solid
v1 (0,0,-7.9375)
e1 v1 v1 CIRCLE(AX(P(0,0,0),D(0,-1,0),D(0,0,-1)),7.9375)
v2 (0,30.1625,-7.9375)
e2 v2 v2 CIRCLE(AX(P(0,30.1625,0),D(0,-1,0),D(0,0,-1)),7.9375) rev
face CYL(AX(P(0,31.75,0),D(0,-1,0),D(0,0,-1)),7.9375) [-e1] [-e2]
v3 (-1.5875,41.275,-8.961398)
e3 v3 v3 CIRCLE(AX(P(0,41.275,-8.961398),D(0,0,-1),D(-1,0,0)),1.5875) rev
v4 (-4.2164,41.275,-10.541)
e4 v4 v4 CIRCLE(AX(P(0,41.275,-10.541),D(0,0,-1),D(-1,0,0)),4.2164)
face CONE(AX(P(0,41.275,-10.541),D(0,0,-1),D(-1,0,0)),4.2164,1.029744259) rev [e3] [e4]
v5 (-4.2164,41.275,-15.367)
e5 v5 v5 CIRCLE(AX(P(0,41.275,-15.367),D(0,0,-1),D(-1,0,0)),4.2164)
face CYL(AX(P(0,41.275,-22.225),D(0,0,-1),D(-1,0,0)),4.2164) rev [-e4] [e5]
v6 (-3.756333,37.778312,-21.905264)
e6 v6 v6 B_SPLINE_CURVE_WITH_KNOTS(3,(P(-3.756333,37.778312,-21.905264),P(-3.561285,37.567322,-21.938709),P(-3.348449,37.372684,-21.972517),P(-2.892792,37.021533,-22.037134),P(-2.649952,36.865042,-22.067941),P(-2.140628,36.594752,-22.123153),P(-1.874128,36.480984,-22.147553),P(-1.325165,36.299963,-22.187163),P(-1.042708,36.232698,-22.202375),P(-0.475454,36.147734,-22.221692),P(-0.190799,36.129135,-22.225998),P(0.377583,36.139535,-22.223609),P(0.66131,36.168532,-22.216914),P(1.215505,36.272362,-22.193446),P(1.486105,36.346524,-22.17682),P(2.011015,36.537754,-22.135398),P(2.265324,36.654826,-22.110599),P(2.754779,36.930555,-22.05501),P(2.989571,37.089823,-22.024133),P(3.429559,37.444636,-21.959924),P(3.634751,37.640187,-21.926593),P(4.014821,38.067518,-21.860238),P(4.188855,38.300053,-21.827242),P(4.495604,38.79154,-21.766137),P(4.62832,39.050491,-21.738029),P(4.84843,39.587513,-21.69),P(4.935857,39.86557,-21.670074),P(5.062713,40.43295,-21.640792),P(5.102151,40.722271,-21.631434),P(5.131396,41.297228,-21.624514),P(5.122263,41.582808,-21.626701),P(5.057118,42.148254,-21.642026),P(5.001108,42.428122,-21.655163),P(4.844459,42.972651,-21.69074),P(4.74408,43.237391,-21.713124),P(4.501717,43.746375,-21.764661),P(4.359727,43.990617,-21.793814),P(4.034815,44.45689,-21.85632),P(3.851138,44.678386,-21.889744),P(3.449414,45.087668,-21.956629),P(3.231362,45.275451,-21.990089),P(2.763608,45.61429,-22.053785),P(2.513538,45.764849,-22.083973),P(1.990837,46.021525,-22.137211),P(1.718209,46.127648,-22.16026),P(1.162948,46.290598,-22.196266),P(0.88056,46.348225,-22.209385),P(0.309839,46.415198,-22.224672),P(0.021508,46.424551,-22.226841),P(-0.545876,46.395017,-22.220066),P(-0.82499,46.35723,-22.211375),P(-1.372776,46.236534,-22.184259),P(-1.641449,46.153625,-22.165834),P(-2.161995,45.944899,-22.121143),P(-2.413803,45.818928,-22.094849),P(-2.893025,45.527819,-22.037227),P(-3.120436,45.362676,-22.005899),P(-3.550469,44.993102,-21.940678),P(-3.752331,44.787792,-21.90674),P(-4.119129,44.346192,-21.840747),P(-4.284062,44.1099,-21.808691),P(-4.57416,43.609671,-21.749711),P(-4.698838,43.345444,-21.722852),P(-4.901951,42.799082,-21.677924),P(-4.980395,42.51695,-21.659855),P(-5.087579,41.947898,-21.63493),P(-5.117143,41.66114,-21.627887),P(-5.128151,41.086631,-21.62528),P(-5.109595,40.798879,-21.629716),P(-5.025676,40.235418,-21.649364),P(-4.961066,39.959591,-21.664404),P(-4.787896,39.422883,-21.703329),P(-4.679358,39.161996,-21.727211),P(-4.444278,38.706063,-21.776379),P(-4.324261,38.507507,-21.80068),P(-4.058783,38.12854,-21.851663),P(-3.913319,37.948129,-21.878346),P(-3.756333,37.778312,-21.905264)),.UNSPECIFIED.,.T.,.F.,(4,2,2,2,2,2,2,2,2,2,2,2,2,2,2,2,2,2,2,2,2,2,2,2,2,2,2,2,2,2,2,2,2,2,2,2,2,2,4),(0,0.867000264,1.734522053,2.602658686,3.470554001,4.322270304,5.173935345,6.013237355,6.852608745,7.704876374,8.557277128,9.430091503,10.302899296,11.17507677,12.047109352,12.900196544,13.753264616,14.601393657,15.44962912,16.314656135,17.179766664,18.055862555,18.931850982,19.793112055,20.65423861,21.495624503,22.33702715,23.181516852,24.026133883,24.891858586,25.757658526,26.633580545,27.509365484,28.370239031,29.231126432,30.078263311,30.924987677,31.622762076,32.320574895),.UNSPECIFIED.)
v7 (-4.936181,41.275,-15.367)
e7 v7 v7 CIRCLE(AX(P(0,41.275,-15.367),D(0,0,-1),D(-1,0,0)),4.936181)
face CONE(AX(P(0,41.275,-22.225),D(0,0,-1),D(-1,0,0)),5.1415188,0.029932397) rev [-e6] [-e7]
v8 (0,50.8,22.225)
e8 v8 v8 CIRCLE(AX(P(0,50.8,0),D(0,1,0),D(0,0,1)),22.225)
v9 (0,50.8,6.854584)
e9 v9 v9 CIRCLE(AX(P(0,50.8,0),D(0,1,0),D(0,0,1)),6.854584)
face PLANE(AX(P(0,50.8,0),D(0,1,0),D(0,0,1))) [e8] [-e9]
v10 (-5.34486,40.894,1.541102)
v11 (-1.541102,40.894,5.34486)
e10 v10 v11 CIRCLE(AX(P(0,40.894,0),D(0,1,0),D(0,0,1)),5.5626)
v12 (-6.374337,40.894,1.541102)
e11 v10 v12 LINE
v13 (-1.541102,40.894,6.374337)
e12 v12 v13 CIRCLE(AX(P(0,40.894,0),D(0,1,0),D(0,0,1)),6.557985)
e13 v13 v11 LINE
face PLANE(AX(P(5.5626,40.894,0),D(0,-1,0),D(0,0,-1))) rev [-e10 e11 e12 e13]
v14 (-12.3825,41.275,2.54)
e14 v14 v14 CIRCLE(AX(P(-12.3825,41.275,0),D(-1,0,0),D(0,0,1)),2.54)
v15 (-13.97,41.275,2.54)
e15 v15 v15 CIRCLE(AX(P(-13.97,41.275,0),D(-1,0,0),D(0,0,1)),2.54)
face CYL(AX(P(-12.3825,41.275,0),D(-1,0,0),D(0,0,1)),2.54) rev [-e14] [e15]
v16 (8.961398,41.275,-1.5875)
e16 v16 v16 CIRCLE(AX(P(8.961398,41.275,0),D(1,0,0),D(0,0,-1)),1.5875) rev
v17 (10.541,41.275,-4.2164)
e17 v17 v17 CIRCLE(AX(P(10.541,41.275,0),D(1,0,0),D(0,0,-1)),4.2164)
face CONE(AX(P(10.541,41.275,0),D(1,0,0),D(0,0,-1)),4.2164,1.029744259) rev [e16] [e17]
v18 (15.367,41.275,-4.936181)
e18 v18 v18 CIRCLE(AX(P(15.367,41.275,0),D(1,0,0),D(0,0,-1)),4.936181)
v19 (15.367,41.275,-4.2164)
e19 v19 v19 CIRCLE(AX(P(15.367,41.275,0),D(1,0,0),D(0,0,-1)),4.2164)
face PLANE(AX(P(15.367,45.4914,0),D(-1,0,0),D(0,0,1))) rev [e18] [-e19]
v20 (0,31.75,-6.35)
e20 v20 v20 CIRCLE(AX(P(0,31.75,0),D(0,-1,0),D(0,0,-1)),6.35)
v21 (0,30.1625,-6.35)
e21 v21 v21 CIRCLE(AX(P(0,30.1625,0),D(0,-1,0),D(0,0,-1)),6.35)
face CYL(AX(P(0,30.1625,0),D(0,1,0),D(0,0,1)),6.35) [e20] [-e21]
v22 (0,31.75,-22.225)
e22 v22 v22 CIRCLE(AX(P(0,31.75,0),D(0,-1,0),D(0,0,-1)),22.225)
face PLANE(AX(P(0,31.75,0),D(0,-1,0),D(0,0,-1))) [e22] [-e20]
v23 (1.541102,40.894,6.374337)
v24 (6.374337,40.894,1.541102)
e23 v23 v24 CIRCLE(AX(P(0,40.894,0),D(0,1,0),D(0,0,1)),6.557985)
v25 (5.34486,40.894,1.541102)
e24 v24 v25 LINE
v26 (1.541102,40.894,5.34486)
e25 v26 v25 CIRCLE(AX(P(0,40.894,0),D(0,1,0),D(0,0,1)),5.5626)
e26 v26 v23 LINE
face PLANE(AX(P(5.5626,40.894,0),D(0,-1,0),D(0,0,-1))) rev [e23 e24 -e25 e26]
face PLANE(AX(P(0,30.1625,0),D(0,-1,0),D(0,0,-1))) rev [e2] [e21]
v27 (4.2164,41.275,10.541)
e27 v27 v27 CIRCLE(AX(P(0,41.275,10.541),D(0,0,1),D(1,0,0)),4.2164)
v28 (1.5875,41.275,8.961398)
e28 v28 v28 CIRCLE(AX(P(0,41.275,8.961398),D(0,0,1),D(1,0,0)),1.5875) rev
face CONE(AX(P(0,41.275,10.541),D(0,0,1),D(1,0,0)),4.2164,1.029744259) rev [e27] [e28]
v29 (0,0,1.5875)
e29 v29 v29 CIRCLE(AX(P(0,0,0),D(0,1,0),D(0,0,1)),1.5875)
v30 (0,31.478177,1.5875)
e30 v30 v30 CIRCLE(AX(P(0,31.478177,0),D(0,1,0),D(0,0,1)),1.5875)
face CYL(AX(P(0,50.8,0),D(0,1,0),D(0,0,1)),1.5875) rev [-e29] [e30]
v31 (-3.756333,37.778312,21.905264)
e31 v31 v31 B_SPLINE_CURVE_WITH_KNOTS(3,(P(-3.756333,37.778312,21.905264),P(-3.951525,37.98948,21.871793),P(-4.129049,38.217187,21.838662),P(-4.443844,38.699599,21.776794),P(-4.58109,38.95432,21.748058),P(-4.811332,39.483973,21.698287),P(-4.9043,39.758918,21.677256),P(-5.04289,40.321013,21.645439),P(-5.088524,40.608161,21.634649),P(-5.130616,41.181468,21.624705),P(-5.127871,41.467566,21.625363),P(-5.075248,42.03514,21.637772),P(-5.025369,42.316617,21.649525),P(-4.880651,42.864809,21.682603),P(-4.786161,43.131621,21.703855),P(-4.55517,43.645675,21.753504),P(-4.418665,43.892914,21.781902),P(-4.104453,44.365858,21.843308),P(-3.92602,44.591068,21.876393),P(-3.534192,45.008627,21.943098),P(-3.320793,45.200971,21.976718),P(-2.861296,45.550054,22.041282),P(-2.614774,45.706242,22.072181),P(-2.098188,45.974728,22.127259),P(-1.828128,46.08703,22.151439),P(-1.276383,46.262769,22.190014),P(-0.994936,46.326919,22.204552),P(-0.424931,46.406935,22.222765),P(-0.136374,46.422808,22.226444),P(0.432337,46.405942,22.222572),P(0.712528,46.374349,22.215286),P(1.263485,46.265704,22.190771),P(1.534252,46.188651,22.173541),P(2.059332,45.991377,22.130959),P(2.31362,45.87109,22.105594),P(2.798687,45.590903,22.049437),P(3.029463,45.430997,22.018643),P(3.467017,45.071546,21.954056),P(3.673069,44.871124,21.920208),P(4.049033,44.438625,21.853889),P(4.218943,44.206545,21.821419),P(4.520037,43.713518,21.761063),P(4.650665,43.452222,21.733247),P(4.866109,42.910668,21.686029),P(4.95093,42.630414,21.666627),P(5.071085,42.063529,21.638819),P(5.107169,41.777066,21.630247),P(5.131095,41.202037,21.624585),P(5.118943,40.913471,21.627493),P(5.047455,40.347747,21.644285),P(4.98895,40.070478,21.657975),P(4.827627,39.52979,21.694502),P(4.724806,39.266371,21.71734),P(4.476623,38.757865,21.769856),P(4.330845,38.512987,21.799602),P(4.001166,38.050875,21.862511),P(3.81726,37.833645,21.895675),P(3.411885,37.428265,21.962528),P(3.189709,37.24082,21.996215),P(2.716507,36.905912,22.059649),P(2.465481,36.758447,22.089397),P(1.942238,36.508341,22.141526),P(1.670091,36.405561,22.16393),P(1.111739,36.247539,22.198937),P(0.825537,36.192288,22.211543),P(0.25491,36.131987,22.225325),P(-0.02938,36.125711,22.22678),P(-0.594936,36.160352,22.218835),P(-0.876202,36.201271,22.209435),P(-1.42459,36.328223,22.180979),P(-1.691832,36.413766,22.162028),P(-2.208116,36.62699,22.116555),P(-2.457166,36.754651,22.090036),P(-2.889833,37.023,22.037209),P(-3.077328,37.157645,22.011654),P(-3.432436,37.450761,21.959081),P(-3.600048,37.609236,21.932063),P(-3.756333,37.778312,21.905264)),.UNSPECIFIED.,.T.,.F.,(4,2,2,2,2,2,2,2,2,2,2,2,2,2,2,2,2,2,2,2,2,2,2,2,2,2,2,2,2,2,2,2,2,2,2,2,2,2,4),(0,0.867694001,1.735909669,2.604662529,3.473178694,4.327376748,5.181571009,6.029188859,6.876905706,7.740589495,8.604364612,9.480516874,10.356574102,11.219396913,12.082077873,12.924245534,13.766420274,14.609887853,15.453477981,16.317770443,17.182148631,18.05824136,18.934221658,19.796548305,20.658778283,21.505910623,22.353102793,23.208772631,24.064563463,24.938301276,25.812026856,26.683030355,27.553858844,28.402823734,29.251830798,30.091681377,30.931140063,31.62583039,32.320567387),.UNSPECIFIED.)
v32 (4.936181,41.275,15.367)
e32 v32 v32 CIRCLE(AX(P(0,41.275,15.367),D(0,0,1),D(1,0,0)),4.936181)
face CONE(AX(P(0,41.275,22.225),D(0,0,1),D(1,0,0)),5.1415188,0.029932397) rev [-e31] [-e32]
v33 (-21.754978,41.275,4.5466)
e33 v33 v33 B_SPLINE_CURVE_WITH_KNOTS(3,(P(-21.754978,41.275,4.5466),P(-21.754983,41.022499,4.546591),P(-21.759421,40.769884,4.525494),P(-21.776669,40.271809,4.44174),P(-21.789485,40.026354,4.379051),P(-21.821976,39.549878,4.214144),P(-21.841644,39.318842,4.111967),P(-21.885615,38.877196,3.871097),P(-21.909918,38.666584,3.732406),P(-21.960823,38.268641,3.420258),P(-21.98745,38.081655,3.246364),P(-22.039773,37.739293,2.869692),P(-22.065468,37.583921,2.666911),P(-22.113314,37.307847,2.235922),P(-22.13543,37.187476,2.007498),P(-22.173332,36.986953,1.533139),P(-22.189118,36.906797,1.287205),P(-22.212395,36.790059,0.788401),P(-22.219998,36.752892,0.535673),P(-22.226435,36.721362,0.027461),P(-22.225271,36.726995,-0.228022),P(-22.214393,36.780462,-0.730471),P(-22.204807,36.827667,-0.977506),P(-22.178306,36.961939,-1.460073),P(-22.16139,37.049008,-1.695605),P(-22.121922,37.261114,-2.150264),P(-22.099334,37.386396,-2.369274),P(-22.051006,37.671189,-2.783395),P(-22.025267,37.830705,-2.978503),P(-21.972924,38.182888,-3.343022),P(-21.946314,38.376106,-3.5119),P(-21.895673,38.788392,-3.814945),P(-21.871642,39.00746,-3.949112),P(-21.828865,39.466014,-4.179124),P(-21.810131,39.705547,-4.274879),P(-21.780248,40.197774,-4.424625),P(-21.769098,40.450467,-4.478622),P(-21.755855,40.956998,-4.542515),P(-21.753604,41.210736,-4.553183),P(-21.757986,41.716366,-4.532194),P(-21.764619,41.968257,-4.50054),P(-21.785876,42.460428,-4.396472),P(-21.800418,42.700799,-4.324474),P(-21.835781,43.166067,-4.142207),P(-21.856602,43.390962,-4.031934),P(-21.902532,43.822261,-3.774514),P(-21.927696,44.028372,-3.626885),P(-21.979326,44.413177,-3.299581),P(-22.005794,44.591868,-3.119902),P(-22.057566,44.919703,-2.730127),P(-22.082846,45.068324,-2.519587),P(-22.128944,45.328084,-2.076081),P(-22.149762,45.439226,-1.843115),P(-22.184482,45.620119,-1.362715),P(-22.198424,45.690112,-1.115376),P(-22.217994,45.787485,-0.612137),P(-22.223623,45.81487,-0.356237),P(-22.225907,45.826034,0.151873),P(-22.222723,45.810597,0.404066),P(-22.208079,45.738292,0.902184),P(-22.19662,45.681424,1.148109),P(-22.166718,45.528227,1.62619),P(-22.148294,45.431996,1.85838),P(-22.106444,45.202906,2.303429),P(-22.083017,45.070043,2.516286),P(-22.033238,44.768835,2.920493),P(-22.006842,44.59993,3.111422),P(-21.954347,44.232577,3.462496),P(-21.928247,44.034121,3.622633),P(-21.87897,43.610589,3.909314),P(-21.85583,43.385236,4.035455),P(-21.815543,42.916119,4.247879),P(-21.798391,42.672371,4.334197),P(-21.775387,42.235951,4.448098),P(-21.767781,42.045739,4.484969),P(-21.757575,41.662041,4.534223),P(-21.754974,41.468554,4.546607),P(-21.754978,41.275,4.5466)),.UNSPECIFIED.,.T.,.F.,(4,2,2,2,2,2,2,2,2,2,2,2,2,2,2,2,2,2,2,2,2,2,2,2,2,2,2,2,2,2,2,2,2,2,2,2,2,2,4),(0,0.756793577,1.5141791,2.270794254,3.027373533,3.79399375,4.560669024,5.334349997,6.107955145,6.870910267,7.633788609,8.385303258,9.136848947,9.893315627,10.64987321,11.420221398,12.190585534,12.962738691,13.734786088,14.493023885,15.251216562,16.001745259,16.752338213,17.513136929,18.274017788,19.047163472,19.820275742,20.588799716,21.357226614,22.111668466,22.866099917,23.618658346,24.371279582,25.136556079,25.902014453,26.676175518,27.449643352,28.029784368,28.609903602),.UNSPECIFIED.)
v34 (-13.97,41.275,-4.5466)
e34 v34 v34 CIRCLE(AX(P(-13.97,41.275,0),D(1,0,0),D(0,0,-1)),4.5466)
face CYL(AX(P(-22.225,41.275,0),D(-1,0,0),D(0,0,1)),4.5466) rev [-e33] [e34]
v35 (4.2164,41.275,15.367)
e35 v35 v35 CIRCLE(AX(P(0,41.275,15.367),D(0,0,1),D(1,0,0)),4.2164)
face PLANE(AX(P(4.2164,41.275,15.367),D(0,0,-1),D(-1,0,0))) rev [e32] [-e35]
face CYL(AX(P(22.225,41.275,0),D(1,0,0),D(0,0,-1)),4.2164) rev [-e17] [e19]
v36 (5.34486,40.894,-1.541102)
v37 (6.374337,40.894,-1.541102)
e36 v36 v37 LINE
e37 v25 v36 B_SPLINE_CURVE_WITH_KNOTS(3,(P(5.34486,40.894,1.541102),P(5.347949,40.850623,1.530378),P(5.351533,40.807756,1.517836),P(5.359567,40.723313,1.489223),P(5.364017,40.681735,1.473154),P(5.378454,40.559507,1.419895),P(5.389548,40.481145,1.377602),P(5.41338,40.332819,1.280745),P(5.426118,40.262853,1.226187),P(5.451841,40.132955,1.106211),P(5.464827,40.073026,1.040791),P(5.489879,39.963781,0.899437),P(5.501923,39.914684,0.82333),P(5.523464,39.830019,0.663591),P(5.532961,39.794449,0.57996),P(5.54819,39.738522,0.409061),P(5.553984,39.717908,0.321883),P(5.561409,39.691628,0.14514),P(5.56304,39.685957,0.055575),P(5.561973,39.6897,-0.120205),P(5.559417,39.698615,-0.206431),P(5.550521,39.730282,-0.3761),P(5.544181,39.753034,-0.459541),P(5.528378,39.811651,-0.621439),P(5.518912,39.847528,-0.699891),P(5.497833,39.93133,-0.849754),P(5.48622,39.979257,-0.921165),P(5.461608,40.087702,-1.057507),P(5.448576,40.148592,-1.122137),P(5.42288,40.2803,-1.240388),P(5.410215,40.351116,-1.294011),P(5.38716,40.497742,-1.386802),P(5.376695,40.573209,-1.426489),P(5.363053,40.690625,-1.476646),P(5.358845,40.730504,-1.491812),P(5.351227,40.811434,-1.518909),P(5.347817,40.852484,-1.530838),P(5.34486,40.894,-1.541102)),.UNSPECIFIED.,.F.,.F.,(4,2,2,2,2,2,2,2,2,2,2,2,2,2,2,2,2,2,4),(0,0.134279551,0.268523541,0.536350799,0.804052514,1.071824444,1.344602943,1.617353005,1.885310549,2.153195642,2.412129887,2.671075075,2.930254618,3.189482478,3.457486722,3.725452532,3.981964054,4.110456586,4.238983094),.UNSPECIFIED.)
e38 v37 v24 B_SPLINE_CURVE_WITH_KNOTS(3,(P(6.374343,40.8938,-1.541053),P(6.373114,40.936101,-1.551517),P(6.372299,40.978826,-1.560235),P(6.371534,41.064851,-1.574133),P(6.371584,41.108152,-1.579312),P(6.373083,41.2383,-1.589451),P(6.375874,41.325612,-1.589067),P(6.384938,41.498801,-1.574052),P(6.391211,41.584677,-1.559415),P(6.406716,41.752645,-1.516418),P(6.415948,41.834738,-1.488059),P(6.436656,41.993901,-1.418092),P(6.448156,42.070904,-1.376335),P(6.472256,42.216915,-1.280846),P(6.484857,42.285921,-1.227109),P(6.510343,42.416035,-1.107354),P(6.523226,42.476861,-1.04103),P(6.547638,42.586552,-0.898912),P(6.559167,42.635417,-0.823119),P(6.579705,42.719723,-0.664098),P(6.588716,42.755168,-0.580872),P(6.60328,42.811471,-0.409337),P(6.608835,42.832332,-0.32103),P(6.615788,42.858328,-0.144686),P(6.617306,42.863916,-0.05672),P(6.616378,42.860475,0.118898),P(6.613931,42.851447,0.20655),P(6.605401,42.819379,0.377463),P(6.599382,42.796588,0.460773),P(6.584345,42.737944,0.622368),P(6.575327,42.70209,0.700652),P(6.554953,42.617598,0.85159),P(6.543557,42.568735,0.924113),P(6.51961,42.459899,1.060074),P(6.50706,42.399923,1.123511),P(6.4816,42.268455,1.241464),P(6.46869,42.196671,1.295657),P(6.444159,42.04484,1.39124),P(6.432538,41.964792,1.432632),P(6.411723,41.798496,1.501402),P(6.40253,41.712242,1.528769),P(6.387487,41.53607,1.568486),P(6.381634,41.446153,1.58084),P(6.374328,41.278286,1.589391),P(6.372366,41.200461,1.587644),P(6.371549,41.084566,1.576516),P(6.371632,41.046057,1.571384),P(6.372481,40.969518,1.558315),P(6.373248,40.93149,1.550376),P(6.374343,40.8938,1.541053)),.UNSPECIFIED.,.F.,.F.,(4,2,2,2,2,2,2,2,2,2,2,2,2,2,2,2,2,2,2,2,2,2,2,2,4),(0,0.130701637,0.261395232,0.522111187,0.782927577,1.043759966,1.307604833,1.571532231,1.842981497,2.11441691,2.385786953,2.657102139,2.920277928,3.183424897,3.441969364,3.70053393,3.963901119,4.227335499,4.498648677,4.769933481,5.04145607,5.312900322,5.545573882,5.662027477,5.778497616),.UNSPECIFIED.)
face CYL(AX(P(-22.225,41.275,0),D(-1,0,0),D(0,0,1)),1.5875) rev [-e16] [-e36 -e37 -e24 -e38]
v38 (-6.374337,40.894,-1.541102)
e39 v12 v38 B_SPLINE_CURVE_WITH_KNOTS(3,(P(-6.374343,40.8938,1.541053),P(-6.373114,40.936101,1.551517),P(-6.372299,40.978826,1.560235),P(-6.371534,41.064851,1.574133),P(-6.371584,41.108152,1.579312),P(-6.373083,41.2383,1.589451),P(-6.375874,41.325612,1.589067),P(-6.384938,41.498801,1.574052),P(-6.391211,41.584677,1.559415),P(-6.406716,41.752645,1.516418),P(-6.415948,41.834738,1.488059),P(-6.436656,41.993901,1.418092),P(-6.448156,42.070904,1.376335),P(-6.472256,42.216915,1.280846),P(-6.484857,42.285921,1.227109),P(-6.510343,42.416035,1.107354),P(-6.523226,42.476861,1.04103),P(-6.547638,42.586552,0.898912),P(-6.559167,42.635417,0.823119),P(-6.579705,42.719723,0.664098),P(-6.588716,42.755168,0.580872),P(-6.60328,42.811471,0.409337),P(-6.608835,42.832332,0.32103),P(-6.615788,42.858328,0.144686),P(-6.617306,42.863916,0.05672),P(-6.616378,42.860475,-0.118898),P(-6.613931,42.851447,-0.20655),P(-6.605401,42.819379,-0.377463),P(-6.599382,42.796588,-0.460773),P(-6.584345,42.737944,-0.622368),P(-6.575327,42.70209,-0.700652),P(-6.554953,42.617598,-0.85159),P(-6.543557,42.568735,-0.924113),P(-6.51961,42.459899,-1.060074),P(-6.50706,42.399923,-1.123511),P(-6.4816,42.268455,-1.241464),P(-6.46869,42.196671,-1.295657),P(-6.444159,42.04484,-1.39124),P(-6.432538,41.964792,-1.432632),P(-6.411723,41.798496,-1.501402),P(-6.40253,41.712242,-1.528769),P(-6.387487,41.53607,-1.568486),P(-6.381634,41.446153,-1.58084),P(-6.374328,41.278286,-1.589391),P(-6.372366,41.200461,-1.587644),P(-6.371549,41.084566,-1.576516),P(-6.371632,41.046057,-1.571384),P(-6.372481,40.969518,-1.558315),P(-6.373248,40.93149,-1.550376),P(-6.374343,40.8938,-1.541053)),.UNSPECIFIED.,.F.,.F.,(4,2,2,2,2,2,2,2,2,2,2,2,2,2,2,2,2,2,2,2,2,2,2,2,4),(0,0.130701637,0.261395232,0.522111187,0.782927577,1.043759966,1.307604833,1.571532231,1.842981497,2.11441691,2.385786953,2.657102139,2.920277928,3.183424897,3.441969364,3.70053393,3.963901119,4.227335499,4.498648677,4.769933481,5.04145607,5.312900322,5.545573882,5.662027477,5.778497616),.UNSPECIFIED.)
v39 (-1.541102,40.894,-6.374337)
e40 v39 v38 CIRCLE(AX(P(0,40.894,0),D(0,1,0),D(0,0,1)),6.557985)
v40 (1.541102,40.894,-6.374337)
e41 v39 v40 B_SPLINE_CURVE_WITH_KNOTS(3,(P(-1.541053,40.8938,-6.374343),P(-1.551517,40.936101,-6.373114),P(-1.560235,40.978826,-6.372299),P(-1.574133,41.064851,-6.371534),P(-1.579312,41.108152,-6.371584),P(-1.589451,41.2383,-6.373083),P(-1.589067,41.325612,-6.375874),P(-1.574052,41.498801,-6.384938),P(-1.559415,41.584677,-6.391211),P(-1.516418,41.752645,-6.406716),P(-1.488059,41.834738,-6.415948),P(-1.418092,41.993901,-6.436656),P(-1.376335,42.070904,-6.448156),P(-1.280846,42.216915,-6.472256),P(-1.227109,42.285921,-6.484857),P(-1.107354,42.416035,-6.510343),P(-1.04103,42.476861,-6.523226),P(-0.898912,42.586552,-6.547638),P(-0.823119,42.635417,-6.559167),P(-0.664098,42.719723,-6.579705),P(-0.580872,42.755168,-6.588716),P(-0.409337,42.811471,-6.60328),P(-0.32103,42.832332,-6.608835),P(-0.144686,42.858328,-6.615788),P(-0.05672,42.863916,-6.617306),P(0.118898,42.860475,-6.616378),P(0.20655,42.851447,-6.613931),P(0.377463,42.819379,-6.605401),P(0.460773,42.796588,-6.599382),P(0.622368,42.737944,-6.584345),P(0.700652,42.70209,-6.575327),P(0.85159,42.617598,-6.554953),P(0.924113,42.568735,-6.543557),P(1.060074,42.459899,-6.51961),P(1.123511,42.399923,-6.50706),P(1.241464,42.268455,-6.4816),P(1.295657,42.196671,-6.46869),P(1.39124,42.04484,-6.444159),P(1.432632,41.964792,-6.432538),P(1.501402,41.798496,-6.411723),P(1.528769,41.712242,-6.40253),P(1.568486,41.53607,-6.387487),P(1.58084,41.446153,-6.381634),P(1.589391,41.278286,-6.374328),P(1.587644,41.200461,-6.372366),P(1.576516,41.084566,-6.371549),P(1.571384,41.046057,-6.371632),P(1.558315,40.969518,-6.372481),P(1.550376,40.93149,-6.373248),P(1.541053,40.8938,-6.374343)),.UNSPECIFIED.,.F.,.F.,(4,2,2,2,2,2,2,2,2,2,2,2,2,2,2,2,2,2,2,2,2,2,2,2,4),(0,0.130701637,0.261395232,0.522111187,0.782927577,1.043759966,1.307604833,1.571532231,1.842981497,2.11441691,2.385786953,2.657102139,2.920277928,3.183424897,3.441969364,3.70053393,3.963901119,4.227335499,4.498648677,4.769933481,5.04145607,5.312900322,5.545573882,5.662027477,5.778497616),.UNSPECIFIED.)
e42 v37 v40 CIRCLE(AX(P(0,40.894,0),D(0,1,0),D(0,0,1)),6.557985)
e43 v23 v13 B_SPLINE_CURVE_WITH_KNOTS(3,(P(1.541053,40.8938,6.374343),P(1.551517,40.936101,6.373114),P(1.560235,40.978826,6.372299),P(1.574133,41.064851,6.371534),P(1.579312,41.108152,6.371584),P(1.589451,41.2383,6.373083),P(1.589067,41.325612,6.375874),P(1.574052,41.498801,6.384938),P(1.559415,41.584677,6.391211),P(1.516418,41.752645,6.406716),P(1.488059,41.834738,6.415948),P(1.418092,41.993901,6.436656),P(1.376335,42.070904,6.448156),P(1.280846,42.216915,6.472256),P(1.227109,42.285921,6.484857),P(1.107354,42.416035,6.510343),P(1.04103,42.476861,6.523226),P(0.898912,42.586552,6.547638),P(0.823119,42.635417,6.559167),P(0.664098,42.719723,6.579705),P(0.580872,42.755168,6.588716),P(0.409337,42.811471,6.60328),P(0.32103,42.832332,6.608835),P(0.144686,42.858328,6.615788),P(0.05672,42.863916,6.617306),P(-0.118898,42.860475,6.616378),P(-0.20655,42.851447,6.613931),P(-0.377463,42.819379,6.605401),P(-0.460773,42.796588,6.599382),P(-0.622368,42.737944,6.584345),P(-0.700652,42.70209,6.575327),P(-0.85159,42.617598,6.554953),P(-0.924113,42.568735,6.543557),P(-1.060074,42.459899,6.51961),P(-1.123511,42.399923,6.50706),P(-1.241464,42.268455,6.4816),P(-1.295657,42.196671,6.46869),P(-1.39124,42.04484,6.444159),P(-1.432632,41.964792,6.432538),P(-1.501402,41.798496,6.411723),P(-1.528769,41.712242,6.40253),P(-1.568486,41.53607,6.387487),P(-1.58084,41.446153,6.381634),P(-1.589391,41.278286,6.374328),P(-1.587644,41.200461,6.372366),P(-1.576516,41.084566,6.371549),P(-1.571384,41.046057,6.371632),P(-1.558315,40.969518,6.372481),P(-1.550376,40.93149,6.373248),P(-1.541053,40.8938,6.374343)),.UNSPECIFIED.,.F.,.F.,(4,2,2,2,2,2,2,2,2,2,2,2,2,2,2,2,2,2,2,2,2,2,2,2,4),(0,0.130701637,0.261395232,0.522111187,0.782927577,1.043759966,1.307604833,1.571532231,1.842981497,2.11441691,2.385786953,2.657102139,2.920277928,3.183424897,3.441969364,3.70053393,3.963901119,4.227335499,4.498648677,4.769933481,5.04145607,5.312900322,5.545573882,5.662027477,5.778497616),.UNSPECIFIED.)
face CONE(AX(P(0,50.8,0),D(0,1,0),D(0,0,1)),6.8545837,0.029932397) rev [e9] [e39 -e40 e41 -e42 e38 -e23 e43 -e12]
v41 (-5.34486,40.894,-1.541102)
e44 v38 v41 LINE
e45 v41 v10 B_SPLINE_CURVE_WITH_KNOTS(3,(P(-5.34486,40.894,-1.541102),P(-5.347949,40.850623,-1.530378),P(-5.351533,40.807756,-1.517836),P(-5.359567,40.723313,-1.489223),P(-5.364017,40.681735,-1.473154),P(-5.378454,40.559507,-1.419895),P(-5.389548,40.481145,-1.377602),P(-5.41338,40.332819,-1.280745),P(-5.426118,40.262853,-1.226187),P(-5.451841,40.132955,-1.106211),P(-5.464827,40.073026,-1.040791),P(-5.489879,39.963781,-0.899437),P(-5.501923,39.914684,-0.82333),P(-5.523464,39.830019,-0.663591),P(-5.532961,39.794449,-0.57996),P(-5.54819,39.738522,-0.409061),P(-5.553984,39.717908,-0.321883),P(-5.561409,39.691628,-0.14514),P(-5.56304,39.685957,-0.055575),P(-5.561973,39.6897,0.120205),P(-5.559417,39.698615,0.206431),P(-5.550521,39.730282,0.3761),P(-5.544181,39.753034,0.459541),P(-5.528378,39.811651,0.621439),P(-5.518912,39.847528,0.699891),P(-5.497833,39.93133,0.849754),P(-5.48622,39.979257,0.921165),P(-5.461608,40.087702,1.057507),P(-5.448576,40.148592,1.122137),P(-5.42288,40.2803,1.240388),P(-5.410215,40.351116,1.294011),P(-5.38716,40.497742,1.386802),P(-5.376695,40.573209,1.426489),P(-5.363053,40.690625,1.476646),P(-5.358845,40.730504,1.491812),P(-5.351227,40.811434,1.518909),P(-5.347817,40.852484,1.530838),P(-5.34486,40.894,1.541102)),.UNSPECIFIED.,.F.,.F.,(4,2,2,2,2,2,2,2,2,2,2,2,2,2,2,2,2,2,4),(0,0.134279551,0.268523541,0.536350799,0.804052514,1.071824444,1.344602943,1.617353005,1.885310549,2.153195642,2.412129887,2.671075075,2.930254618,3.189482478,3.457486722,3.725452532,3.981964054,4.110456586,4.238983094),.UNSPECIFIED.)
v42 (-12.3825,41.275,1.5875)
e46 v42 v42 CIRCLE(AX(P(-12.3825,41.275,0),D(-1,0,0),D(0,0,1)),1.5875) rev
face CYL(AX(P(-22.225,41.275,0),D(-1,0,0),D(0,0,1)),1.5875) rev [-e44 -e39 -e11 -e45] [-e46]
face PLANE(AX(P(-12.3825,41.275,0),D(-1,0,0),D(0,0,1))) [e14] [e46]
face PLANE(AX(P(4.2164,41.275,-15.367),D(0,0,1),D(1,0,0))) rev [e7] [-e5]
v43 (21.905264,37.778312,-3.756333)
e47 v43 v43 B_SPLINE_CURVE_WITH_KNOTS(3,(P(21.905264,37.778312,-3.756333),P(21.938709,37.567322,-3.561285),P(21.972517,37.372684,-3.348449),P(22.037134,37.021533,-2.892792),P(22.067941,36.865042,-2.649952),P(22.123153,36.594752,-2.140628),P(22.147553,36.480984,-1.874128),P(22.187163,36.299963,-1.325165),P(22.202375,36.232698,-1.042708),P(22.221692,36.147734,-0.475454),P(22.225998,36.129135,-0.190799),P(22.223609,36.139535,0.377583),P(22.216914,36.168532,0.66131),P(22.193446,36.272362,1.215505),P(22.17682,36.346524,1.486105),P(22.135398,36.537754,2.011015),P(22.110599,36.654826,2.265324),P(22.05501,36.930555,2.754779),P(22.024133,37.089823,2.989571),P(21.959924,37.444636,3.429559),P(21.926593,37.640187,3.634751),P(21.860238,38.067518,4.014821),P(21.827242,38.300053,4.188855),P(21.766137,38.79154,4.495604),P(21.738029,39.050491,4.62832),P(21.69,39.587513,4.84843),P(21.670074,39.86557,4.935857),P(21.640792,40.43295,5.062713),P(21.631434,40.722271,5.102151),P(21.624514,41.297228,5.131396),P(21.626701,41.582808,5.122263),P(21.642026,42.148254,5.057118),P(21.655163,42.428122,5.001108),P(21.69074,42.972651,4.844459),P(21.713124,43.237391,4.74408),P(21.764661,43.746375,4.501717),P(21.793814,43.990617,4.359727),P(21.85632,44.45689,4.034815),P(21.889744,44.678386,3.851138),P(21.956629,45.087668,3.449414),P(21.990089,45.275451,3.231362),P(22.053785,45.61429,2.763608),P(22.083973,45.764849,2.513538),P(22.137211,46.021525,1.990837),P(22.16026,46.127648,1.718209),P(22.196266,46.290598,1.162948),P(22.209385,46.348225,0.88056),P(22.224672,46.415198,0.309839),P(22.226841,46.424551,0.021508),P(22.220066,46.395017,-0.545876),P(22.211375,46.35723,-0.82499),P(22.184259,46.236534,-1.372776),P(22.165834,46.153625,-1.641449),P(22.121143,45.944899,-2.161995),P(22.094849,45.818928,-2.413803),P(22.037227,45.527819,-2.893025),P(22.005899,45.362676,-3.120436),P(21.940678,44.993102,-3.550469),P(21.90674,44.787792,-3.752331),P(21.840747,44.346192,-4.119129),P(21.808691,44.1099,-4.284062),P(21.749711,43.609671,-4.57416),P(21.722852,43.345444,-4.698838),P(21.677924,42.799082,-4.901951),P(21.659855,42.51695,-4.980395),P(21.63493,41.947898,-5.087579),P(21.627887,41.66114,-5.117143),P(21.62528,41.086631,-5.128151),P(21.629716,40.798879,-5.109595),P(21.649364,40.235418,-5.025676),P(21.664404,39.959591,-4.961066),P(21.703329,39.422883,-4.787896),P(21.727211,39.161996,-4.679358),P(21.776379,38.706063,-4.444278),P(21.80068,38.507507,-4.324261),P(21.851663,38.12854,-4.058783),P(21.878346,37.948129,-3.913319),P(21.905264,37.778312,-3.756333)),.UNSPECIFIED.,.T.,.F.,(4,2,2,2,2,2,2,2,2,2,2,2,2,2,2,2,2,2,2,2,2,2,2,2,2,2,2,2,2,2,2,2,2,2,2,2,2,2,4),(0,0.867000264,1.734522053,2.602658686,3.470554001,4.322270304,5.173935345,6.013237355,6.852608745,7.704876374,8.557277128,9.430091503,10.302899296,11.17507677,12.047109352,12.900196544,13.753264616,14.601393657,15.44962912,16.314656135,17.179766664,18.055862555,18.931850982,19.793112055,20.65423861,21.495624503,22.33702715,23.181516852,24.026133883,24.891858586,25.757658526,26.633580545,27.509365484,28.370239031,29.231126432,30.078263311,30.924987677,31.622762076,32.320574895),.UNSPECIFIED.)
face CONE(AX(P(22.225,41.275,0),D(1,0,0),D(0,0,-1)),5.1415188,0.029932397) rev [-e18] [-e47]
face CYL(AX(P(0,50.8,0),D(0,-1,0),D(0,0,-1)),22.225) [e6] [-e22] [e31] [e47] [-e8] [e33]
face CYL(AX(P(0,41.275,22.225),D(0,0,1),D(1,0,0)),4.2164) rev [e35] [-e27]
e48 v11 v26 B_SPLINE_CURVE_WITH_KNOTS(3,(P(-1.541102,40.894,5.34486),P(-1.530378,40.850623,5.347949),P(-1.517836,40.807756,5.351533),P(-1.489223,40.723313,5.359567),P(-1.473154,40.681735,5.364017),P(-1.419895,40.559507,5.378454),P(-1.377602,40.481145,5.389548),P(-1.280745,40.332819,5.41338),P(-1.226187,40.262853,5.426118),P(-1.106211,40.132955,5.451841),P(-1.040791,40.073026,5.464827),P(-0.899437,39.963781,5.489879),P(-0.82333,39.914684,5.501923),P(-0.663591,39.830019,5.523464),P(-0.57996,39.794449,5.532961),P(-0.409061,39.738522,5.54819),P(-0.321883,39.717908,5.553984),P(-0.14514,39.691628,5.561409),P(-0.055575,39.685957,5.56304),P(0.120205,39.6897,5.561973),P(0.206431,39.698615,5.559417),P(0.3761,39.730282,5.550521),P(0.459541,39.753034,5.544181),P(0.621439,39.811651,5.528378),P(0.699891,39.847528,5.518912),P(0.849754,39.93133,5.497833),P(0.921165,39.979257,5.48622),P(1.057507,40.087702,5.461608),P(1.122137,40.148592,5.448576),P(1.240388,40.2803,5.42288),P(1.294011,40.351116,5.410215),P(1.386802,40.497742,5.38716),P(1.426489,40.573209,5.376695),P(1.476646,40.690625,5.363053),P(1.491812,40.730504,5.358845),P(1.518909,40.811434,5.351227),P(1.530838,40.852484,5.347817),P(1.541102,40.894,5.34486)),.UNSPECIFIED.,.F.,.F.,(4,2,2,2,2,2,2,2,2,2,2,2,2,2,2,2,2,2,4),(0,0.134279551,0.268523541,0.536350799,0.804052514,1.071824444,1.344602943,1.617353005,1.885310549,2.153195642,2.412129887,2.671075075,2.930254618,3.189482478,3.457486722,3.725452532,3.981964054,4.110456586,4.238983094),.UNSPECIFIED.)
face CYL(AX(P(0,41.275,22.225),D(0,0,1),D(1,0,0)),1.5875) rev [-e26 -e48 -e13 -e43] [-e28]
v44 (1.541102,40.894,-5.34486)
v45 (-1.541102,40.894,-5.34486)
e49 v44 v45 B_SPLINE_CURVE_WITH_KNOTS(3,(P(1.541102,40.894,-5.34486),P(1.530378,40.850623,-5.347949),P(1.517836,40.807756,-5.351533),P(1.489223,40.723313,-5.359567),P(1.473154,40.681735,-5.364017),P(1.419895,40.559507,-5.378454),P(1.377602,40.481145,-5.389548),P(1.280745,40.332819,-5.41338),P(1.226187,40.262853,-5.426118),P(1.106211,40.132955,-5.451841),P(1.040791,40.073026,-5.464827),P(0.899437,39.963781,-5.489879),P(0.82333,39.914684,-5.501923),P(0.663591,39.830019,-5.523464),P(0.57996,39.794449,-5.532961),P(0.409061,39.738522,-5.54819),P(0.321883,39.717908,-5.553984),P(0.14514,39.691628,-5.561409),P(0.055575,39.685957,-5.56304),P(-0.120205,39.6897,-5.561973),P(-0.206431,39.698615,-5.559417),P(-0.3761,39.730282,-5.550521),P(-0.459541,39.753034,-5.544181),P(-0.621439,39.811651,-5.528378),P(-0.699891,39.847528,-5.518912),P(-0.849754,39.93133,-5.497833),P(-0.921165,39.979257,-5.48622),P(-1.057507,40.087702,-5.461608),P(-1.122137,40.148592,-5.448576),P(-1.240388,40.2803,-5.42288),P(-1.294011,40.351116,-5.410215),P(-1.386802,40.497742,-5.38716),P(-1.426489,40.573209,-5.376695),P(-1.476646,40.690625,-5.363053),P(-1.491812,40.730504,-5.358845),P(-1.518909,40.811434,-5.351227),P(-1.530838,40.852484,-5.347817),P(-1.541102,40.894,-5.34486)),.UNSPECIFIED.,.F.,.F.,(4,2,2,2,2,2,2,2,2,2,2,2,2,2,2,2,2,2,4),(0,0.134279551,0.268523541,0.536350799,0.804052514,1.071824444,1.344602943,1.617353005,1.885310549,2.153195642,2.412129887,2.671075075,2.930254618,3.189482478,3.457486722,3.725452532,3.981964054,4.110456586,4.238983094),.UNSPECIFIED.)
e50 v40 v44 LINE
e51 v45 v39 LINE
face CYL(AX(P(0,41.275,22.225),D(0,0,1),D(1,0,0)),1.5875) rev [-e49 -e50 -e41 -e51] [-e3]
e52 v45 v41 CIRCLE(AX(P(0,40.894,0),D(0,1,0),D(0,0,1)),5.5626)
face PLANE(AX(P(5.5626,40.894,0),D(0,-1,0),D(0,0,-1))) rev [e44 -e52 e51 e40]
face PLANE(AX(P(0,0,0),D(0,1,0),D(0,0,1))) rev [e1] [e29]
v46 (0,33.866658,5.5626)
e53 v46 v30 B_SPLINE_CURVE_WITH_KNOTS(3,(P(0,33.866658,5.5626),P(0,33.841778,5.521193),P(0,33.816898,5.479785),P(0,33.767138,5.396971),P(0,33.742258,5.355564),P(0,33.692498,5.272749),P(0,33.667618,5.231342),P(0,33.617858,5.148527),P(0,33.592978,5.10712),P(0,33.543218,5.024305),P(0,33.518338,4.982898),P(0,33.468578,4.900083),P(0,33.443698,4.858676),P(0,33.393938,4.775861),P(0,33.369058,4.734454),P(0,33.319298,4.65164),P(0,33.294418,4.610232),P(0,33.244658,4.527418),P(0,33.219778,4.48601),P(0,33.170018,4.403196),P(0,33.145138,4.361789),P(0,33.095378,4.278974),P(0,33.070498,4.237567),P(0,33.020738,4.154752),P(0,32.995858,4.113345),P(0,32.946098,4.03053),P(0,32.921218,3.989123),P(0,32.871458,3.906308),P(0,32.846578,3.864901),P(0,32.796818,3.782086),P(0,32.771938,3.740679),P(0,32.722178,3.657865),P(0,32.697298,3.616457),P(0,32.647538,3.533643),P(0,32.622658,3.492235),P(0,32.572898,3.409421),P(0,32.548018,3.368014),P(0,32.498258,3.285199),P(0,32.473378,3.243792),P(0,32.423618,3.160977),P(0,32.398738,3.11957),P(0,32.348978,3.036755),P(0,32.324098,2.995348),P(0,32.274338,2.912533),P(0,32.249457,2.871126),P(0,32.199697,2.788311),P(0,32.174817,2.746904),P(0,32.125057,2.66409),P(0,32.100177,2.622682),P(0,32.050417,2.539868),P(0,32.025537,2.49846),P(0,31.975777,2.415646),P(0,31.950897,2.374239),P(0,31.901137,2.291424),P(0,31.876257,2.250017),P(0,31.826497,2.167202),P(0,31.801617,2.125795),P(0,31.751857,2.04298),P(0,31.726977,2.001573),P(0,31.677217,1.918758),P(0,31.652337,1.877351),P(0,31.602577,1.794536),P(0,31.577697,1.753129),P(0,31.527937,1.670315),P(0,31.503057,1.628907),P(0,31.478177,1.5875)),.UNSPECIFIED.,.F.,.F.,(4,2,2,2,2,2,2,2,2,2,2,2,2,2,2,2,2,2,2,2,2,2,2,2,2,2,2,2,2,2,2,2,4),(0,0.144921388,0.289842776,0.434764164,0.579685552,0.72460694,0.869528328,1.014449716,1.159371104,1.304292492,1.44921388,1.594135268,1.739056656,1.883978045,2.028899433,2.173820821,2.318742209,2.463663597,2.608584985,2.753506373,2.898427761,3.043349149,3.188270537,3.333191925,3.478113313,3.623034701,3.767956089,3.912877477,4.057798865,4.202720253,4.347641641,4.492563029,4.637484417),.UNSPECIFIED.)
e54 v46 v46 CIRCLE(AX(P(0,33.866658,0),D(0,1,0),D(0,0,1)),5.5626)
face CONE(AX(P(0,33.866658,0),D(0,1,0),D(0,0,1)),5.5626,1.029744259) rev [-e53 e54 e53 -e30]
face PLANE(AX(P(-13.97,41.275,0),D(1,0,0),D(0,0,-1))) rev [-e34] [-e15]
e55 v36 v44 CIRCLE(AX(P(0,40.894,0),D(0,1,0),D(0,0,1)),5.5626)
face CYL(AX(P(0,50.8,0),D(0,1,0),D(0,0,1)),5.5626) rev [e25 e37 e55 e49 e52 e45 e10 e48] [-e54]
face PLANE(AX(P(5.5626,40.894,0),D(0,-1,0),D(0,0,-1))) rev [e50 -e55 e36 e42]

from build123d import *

# Parameters (mm, degrees)
SKETCH1_R                              = 22.225
BOSS_EXTRUDE1_DEPTH                    = 50.8
SKETCH2_OUTSIDE_W                      = 62.614
SKETCH2_OUTSIDE_H                      = 62.614
SKETCH2_OUTSIDE_R                      = 7.9375
CUT_EXTRUDE1_DEPTH                     = 31.75
F_1_8_0_125_DIAMETER_HOLE1_D           = 3.175
F_1_8_START                            = -22.225000076
F_1_8_0_125_DIAMETER_HOLE2_OUTLINE_R   = 1.5875
F_1_8_0_125_DIAMETER_HOLE2_DEPTH       = 31.186397695
F_1_8_START_2                          = -8.961397619
F_1_8_0_125_DIAMETER_HOLE2_2_OUTLINE_R = 1.5875
F_1_8_0_125_DIAMETER_HOLE2_2_DEPTH     = 17.922795238
F_1_8_27_NPSM_TAPPED_HOLE1_D           = 9.0932
F_1_8_27_NPSM_TAPPED_HOLE1_DEPTH       = 6.35
F_1_8_27_NPSM_TAPPED_HOLE1_TIP         = 2.73187289
CUT_EXTRUDE2_START                     = -13.97
SKETCH11_R                             = 4.5466
CUT_EXTRUDE2_DEPTH                     = 6.35
SKETCH12_R                             = 2.54
CUT_EXTRUDE3_DEPTH                     = 1.5875
CUT_EXTRUDE5_START                     = -31.75
SKETCH13_OUTSIDE_W                     = 62.614
SKETCH13_OUTSIDE_H                     = 62.614
SKETCH13_OUTSIDE_R                     = 6.35
CUT_EXTRUDE5_DEPTH                     = 1.5875


# Read off the part's stored shape, not the designer's step: 1/8 (0.125) Diameter Hole2
with BuildPart() as part:
    # Sketch1 → Boss-Extrude1 (new body)
    with BuildSketch(Plane(origin=(0, 0, 0), x_dir=(1, 0, 0), z_dir=(0, 1, 0))):
        with Locations(Location((0, 0, 0), (0, 0, 270))):
            Circle(SKETCH1_R)
    extrude(amount=BOSS_EXTRUDE1_DEPTH)

    # Sketch2 outside → Cut-Extrude1 (cut)
    with BuildSketch(Plane(origin=(0, 0, 0), x_dir=(-1, 0, 0), z_dir=(0, -1, 0))):
        Rectangle(SKETCH2_OUTSIDE_W, SKETCH2_OUTSIDE_H)
        with Locations(Location((0, 0, 0), (0, 0, 90))):
            Circle(SKETCH2_OUTSIDE_R, mode=Mode.SUBTRACT)
    extrude(amount=-CUT_EXTRUDE1_DEPTH, mode=Mode.SUBTRACT)

    # 1/8 (0.125) Diameter Hole1 (through all)
    with Locations(Plane(origin=(0, 50.8, 0), x_dir=(1, 0, 0), z_dir=(0, 1, 0))):
        with Locations((0, 0)):
            Hole(F_1_8_0_125_DIAMETER_HOLE1_D / 2)

    # Sketch6 → 1/4 NPT Tapped Hole1 (revolve, cut)
    with BuildSketch(Plane(origin=(0, 50.8, 0), x_dir=(0, 0, 1), z_dir=(1, 0, 0))):
        Polygon((0, 0), (0, 20.275689079), (5.5626, 16.9333418), (5.5626, 9.906), (6.557984794, 9.906), (6.8545837, 0), align=None)
    revolve(axis=Axis((0, 57.15, 0), (0, -1, 0)), mode=Mode.SUBTRACT)

    # Sketch8 → 1/8 NPT Tapped Hole1 (revolve, cut)
    with BuildSketch(Plane(origin=(22.225, 41.275, 0), x_dir=(0, 0, -1), z_dir=(0, 1, 0))):
        Polygon((0, 0), (0, 14.217468714), (4.2164, 11.684), (4.2164, 6.858), (4.936181096, 6.858), (5.1415188, 0), align=None)
    revolve(axis=Axis((28.575, 41.275, 0), (-1, 0, 0)), mode=Mode.SUBTRACT)

    # Sketch8 at point 2 (carried to point 2, square into its face) → 1/8 NPT Tapped Hole1 at 2 (revolve, cut)
    with BuildSketch(Plane(origin=(0, 41.275, -22.225), x_dir=(-1, 0, 0), z_dir=(0, 1, 0))):
        Polygon((0, 0), (0, 14.217468714), (4.2164, 11.684), (4.2164, 6.858), (4.936181096, 6.858), (5.1415188, 0), align=None)
    revolve(axis=Axis((0, 41.275, -28.575), (0, 0, 1)), mode=Mode.SUBTRACT)

    # Sketch8 at point 3 (carried to point 3, square into its face) → 1/8 NPT Tapped Hole1 at 3 (revolve, cut)
    with BuildSketch(Plane(origin=(0, 41.275, 22.225), x_dir=(1, 0, 0), z_dir=(0, 1, 0))):
        Polygon((0, 0), (0, 14.217468714), (4.2164, 11.684), (4.2164, 6.858), (4.936181096, 6.858), (5.1415188, 0), align=None)
    revolve(axis=Axis((0, 41.275, 28.575), (0, 0, -1)), mode=Mode.SUBTRACT)

    # 1/8 (0.125) Diameter Hole2 outline → 1/8 (0.125) Diameter Hole2 (cut)
    with BuildSketch(Plane.YZ.offset(F_1_8_START)):
        with Locations((41.275, 0)):
            Circle(F_1_8_0_125_DIAMETER_HOLE2_OUTLINE_R)
    extrude(amount=F_1_8_0_125_DIAMETER_HOLE2_DEPTH, mode=Mode.SUBTRACT)

    # 1_8 _0.125_ Diameter Hole2 2 outline → 1_8 _0.125_ Diameter Hole2 2 (cut)
    with BuildSketch(Plane.XY.offset(F_1_8_START_2)):
        with Locations((0, 41.275)):
            Circle(F_1_8_0_125_DIAMETER_HOLE2_2_OUTLINE_R)
    extrude(amount=F_1_8_0_125_DIAMETER_HOLE2_2_DEPTH, mode=Mode.SUBTRACT)

    # 1/8-27 NPSM Tapped Hole1
    with Locations(Plane(origin=(-22.225, 41.275, 0), x_dir=(0, 0, -1), z_dir=(-1, 0, 0))):
        with Locations((0, 0)):
            Hole(F_1_8_27_NPSM_TAPPED_HOLE1_D / 2, depth=F_1_8_27_NPSM_TAPPED_HOLE1_DEPTH)
            with Locations((0, 0, -(F_1_8_27_NPSM_TAPPED_HOLE1_DEPTH + F_1_8_27_NPSM_TAPPED_HOLE1_TIP / 2))):  # 118° drill point
                Cone(0, F_1_8_27_NPSM_TAPPED_HOLE1_D / 2, F_1_8_27_NPSM_TAPPED_HOLE1_TIP, mode=Mode.SUBTRACT)

    # Sketch11 → Cut-Extrude2 (cut)
    with BuildSketch(Plane(origin=(0, 0, 0), x_dir=(0, 0, -1), z_dir=(1, 0, 0)).offset(CUT_EXTRUDE2_START)):
        with Locations(Location((0, 41.275, 0), (0, 0, 180))):
            Circle(SKETCH11_R)
    extrude(amount=-CUT_EXTRUDE2_DEPTH, mode=Mode.SUBTRACT)

    # Sketch12 → Cut-Extrude3 (cut)
    with BuildSketch(Plane.ZY.offset(13.97)):
        with Locations((0, 41.275)):
            Circle(SKETCH12_R)
    extrude(amount=-CUT_EXTRUDE3_DEPTH, mode=Mode.SUBTRACT)

    # Sketch13 outside → Cut-Extrude5 (cut)
    with BuildSketch(Plane.XZ.offset(CUT_EXTRUDE5_START)):
        Rectangle(SKETCH13_OUTSIDE_W, SKETCH13_OUTSIDE_H)
        with Locations(Location((0, 0, 0), (0, 0, 270))):
            Circle(SKETCH13_OUTSIDE_R, mode=Mode.SUBTRACT)
    extrude(amount=CUT_EXTRUDE5_DEPTH, mode=Mode.SUBTRACT)


solid = part.part
